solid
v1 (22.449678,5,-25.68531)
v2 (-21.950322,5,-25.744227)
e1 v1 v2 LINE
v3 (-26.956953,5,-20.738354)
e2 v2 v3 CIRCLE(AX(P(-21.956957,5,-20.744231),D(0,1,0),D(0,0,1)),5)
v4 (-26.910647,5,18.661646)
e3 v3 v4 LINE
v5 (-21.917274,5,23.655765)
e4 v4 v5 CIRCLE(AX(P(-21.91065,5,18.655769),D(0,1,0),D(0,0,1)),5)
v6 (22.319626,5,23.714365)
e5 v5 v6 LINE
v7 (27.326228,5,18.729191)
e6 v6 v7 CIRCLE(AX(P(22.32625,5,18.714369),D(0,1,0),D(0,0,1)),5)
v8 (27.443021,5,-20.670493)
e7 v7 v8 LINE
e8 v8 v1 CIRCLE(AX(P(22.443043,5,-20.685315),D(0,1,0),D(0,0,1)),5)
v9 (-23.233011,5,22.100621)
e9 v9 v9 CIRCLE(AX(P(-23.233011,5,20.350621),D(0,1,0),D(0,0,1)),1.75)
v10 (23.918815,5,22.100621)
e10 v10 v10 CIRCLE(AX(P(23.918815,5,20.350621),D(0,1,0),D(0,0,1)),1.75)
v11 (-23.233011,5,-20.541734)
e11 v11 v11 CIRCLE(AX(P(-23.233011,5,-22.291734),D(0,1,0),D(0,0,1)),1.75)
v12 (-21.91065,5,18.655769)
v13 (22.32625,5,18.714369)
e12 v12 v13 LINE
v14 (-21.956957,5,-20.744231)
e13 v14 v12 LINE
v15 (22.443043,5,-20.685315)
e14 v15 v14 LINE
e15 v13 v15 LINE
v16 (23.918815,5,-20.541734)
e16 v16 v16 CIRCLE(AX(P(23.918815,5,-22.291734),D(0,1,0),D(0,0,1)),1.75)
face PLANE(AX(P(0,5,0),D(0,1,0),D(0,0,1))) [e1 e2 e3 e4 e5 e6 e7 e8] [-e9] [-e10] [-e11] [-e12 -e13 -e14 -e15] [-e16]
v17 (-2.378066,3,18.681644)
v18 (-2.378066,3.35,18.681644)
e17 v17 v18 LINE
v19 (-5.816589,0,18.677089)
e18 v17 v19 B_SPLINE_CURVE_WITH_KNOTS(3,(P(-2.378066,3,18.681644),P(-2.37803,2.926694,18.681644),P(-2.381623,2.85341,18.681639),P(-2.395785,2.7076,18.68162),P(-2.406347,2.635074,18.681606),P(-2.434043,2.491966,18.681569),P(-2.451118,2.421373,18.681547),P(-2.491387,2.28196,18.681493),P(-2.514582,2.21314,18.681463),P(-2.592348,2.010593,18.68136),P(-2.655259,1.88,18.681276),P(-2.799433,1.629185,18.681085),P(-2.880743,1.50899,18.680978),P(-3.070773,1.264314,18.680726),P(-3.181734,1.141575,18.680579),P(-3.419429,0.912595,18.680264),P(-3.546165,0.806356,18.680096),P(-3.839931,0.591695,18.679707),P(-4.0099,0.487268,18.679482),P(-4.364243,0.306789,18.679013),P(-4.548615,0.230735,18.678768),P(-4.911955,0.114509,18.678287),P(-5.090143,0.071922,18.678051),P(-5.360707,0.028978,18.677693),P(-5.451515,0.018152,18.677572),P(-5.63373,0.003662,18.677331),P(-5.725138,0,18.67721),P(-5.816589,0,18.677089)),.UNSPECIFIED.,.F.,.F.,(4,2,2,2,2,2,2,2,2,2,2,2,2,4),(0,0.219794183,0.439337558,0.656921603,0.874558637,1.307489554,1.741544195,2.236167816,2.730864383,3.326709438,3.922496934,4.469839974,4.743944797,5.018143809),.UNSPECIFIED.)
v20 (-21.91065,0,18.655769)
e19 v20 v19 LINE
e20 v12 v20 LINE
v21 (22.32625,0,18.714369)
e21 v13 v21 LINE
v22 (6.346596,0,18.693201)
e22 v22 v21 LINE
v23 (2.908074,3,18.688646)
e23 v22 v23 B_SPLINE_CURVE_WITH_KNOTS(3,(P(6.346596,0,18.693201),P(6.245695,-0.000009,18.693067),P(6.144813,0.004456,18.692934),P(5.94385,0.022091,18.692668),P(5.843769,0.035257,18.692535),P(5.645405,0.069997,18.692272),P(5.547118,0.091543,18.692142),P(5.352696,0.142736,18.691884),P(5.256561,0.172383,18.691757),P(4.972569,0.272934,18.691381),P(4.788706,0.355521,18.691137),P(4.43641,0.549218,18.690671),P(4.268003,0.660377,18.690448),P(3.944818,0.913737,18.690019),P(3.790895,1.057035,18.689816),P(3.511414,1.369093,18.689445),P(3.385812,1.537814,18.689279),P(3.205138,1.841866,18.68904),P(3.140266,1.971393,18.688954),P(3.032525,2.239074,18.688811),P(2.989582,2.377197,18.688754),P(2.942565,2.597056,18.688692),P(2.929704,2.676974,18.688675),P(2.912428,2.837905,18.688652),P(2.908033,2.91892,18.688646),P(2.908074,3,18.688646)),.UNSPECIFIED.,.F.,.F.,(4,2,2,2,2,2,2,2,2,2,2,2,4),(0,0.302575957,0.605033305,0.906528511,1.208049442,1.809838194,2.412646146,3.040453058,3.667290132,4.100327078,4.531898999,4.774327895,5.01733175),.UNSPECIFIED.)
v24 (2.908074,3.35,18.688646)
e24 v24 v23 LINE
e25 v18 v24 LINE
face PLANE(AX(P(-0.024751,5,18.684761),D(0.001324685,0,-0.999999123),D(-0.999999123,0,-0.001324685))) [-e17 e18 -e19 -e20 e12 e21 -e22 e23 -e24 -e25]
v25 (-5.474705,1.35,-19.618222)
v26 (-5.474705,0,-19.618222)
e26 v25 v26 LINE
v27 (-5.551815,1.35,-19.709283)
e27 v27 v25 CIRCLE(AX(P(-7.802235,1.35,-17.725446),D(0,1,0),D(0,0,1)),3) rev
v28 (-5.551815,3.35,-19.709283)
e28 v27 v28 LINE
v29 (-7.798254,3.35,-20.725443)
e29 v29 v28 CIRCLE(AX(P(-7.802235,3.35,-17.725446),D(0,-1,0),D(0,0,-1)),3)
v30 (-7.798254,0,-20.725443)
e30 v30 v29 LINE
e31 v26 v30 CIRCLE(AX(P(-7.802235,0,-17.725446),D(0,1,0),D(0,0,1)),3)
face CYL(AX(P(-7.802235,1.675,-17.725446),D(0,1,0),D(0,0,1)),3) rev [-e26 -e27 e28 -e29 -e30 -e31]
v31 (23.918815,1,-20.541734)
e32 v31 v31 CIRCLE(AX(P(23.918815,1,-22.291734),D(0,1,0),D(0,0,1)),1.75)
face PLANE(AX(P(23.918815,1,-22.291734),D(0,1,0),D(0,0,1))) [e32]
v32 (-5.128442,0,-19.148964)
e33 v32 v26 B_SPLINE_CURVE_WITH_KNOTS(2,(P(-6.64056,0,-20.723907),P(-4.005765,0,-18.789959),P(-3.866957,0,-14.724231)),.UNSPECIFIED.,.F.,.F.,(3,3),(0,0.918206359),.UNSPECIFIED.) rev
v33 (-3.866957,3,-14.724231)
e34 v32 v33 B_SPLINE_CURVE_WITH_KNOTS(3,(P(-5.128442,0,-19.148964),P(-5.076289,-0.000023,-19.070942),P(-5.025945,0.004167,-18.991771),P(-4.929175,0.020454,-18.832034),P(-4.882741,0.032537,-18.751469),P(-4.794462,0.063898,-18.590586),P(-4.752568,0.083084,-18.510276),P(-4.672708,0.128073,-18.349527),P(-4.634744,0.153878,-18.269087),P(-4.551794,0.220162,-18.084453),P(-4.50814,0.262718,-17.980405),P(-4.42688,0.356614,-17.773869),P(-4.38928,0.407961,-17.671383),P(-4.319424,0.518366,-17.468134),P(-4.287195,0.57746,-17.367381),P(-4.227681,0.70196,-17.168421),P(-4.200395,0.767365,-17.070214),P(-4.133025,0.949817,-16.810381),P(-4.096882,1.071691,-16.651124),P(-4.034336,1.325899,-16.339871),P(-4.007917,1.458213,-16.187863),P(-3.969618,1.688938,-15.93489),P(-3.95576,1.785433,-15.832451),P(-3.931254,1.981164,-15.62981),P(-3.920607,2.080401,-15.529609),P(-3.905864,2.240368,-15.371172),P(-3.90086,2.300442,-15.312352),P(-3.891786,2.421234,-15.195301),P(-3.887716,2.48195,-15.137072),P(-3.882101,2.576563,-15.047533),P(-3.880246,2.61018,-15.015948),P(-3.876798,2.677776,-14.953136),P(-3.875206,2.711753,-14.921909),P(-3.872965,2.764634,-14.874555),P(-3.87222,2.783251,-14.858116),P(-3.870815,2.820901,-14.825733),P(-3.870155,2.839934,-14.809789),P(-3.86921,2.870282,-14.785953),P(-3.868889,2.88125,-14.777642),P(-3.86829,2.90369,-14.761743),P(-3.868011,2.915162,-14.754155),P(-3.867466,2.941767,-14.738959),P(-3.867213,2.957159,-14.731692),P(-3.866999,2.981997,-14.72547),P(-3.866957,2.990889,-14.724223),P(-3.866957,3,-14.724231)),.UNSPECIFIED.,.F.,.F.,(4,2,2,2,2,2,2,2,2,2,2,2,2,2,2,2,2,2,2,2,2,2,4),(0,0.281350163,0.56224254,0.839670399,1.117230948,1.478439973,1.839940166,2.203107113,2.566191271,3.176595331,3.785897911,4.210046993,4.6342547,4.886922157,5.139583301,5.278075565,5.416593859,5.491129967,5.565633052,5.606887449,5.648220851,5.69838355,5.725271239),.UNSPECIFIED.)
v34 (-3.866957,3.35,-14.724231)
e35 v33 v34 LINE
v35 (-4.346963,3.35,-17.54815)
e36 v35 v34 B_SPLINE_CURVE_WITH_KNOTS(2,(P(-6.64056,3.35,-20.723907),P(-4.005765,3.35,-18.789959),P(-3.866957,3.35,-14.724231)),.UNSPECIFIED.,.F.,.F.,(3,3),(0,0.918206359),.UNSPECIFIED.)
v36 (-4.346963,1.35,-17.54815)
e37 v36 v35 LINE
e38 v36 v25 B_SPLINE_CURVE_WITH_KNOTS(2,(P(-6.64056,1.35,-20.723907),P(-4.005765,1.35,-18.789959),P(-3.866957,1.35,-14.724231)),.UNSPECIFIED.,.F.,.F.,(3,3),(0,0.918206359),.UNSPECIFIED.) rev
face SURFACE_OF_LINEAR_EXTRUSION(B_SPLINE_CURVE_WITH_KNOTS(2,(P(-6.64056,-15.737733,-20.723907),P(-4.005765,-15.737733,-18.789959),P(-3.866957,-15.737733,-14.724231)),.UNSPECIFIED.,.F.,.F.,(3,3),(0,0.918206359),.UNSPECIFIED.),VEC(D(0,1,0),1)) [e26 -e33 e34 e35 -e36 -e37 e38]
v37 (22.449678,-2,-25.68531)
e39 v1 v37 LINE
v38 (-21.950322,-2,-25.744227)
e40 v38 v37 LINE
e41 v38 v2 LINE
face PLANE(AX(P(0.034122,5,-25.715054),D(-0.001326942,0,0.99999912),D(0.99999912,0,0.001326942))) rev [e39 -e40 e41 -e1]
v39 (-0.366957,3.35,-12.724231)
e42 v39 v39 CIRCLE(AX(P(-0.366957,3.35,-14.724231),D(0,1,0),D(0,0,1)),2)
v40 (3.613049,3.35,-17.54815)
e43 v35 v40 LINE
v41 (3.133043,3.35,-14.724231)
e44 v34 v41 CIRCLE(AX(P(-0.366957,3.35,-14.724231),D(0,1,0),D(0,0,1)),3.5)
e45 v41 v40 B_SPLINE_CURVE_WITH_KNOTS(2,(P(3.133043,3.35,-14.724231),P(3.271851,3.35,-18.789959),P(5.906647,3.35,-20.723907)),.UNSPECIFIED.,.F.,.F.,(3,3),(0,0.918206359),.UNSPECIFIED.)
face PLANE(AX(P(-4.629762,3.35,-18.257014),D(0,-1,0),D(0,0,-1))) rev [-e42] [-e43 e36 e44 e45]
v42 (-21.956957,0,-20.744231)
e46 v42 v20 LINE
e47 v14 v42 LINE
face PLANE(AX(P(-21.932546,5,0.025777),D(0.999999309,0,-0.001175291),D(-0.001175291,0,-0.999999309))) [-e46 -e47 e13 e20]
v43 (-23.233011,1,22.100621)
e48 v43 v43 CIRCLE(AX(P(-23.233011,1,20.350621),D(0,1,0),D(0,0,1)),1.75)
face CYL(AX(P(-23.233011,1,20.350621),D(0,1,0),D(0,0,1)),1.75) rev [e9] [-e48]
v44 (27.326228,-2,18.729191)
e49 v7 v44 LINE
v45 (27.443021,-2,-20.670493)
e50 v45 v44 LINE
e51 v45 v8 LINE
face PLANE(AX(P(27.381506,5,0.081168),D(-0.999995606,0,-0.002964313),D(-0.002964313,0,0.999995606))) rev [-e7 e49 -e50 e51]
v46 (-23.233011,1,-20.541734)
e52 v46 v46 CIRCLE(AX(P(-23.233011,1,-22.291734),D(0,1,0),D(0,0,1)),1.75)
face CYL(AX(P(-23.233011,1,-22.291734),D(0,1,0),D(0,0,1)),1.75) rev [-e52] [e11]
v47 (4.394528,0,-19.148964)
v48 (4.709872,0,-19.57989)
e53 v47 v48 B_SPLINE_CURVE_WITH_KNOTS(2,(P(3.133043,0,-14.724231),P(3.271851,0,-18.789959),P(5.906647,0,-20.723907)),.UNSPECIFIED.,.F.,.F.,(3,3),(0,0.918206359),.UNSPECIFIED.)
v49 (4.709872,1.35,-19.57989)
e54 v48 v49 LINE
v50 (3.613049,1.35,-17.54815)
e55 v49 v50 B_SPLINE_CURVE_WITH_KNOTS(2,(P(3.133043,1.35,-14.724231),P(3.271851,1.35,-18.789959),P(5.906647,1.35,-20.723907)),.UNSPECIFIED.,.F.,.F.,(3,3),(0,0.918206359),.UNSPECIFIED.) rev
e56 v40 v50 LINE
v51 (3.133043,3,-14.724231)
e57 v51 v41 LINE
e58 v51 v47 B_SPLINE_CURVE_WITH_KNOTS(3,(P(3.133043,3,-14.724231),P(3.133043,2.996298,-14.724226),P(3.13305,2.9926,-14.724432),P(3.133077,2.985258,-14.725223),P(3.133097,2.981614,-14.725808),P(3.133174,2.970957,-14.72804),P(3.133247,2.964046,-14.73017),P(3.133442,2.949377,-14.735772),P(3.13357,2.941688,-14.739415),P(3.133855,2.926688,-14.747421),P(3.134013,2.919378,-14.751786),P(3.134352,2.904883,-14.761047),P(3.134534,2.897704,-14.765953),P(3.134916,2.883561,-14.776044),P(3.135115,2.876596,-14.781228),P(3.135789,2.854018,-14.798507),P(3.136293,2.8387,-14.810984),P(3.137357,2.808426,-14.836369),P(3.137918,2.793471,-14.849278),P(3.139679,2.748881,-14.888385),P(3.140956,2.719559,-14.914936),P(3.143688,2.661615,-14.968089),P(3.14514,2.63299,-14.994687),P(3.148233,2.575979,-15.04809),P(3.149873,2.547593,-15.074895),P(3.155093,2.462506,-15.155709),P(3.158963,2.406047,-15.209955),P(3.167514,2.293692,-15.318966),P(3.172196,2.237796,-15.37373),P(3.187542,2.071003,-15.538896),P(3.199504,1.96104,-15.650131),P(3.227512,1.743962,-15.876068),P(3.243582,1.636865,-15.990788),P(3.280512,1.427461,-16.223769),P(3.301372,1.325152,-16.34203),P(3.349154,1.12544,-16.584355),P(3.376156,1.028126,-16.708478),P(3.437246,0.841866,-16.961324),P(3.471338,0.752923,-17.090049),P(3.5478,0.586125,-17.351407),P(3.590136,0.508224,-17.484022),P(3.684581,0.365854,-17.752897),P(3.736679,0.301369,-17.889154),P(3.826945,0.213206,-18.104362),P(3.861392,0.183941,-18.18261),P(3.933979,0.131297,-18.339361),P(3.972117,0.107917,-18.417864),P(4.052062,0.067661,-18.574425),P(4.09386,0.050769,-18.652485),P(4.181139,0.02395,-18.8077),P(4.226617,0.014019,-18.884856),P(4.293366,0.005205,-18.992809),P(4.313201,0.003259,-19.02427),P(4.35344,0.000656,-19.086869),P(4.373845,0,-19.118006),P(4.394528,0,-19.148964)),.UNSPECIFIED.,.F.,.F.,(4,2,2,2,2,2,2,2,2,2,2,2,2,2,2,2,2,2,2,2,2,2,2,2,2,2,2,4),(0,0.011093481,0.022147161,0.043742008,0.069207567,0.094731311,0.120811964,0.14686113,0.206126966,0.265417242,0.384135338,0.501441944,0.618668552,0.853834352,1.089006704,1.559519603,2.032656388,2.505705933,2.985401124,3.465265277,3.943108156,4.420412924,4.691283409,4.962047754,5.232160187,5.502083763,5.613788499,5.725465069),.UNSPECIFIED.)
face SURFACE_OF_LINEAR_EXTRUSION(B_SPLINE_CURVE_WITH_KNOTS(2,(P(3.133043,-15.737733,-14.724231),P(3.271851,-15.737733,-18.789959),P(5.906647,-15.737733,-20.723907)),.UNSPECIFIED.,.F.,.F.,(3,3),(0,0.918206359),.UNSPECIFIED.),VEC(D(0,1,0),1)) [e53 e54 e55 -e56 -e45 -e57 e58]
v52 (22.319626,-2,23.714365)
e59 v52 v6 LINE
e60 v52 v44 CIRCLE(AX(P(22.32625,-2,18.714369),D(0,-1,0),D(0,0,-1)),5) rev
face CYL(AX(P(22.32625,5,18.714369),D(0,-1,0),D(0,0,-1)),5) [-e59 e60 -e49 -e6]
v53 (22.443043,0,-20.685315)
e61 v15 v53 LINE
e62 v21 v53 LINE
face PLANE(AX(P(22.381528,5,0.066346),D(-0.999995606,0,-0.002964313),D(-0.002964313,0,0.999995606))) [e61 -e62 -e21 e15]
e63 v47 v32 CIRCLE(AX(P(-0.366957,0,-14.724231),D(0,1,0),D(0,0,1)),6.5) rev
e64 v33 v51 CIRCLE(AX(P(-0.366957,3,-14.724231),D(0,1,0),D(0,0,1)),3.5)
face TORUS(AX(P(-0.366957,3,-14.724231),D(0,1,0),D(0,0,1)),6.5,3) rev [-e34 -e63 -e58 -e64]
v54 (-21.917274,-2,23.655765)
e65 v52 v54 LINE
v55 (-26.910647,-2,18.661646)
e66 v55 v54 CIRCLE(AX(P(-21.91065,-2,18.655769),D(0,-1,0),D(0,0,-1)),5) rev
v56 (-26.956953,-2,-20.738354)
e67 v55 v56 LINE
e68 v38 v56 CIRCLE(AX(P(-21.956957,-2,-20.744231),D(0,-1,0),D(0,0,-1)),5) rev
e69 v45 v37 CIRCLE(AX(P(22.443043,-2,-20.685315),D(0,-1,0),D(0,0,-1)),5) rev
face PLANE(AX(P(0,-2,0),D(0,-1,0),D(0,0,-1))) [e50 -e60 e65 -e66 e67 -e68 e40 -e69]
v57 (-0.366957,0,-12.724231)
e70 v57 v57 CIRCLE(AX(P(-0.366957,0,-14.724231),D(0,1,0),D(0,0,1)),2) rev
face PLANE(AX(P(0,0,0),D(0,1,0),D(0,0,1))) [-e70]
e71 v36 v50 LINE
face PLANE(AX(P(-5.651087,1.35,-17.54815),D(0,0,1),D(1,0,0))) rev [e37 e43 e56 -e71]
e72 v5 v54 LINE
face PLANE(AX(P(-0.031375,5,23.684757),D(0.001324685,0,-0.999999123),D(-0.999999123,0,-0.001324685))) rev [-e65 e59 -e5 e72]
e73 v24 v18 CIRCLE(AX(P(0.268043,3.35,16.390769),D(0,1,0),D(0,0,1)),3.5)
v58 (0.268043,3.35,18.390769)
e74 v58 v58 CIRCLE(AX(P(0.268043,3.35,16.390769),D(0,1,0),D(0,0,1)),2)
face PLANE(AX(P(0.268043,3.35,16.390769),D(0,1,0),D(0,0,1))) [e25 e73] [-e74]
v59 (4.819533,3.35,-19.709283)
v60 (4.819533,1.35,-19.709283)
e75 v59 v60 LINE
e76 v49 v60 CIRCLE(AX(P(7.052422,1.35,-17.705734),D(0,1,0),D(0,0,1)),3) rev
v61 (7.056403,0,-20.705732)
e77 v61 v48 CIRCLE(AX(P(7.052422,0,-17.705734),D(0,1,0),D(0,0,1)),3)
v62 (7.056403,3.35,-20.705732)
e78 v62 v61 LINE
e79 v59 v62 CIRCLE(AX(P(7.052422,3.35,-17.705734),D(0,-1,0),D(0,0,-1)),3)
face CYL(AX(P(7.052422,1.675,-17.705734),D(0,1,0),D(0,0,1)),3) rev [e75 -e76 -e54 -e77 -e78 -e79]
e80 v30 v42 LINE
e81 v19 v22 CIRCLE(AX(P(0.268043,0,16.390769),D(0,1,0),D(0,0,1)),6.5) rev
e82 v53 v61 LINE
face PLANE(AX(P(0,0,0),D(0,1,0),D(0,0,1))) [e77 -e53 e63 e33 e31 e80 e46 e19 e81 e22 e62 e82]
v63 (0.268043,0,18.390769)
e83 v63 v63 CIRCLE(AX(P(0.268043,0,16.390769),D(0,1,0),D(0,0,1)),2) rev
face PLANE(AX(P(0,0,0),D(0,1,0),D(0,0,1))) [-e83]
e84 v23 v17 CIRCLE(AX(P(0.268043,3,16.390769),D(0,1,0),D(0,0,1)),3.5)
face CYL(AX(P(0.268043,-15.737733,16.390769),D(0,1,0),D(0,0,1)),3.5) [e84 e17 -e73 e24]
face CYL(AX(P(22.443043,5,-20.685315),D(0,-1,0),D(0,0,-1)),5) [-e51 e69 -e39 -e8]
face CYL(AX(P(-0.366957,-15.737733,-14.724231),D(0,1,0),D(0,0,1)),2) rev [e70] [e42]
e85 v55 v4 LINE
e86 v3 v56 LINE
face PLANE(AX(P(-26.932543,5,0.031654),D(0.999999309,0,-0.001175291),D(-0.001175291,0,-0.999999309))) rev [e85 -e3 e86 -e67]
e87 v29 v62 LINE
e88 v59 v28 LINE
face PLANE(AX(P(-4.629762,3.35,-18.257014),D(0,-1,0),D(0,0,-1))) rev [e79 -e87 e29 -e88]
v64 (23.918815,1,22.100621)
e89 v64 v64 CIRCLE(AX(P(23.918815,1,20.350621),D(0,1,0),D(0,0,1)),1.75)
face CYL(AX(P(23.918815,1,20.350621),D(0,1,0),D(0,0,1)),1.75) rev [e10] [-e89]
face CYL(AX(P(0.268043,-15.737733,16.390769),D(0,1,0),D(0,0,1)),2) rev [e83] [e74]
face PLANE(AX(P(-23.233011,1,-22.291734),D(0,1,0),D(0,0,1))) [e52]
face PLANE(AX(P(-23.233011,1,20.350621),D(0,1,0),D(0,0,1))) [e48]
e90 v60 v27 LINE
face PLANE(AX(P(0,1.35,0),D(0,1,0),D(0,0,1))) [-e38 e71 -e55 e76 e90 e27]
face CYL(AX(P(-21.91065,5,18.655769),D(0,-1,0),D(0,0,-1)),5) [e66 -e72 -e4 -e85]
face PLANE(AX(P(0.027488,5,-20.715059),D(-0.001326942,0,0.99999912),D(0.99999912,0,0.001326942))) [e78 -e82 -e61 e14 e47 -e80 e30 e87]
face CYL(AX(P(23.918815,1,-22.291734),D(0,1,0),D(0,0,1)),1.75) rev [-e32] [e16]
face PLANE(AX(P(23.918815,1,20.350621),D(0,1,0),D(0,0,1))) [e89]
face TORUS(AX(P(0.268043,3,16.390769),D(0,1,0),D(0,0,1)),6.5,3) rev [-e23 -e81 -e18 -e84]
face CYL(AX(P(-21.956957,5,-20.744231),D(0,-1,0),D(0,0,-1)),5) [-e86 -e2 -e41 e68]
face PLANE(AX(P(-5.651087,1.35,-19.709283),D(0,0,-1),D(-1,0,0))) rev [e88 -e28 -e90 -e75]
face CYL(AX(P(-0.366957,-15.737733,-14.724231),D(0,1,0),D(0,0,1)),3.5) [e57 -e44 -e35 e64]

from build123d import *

# Parameters (mm, degrees)
CROQUIS1_R              = 1.3
SALIENTE_EXTRUIR1_DEPTH = 5
VACIADO1_START          = -5
VACIADO1_DEPTH          = 5
VACIADO1_2_OUTLINE_R    = 1.3
VACIADO1_2_DEPTH        = 5
VACIADO1_3_OUTLINE_R    = 1.3
VACIADO1_3_DEPTH        = 5
SALIENTE_EXTRUIR2_START = -1.65
CROQUIS2_R              = 3.5
CROQUIS2_R_2            = 2
SALIENTE_EXTRUIR2_DEPTH = 3.35
CROQUIS3_R              = 2
CORTAR_EXTRUIR1_DEPTH   = 5
REDONDEO1_R             = 5
CROQUIS4_R              = 1.75
CORTAR_EXTRUIR2_DEPTH   = 4
REDONDEO2_R             = 3
CROQUIS5_W              = 10.71017297
CROQUIS5_H              = 2.16113269
CORTAR_EXTRUIR3_DEPTH   = 2
REDONDEO3_R             = 5
CROQUIS6_W              = 134.393326308
CROQUIS6_H              = 117.100902836
CORTAR_EXTRUIR4_DEPTH   = 3


# Read off the part's stored shape, not the designer's step: Vaciado1
with BuildPart() as part:
    # Croquis1 → Saliente-Extruir1 (new body)
    with BuildSketch(Plane(origin=(0, 0, 0), x_dir=(1, 0, 0), z_dir=(0, 1, 0))):
        Polygon((-21.910650365, -18.655769069), (22.326249635, -18.714369069), (22.443043136, 20.685314639), (-21.956956864, 20.744230931), align=None)
        with Locations(Location((0.268043136, -16.390769069, 0), (0, 0, 270))):
            Circle(CROQUIS1_R, mode=Mode.SUBTRACT)
        with Locations(Location((-0.366956864, 14.724230931, 0), (0, 0, 270))):
            Circle(CROQUIS1_R, mode=Mode.SUBTRACT)
    extrude(amount=SALIENTE_EXTRUIR1_DEPTH)

    # Vaciado1 outline → Vaciado1 (add)
    with BuildSketch(Plane(origin=(0, 0, 0), x_dir=(1, 0, 0), z_dir=(0, 1, 0)).offset(VACIADO1_START)):
        Polygon((-26.904785129, -23.649157796), (27.311430385, -23.720977255), (27.457867021, 25.678664653), (-26.962844589, 25.750877863), align=None)
    extrude(amount=VACIADO1_DEPTH)

    # Vaciado1 2 outline → Vaciado1 2 (add)
    # profile 1 of 3: a face of its own
    with BuildSketch(Plane(origin=(0, 0, 0), x_dir=(1, 0, 0), z_dir=(0, 1, 0))):
        Polygon((-26.904785129, -23.649157796), (27.311430385, -23.720977255), (27.457867021, 25.678664653), (-26.962844589, 25.750877863), align=None)
        Polygon((22.443043136, 20.685314639), (22.326249635, -18.714369069), (-21.910650365, -18.655769069), (-21.956956864, 20.744230931), align=None, mode=Mode.SUBTRACT)
    # profile 2 of 3: a face of its own
    with BuildSketch(Plane(origin=(0, 0, 0), x_dir=(1, 0, 0), z_dir=(0, 1, 0))):
        with Locations((0.268043136, -16.390769069)):
            Circle(VACIADO1_2_OUTLINE_R)
    # profile 3 of 3: a face of its own
    with BuildSketch(Plane(origin=(0, 0, 0), x_dir=(1, 0, 0), z_dir=(0, 1, 0))):
        with Locations((-0.366956864, 14.724230931)):
            Circle(VACIADO1_2_OUTLINE_R)
    extrude(amount=VACIADO1_2_DEPTH)

    # Vaciado1 3 outline → Vaciado1 3 (cut)
    with BuildSketch(Plane(origin=(0, 0, 0), x_dir=(1, 0, 0), z_dir=(0, 1, 0))):
        Polygon((-21.910650365, -18.655769069), (22.326249635, -18.714369069), (22.443043136, 20.685314639), (-21.956956864, 20.744230931), align=None)
        with Locations((0.268043136, -16.390769069)):
            Circle(VACIADO1_3_OUTLINE_R, mode=Mode.SUBTRACT)
        with Locations((-0.366956864, 14.724230931)):
            Circle(VACIADO1_3_OUTLINE_R, mode=Mode.SUBTRACT)
    extrude(amount=VACIADO1_3_DEPTH, mode=Mode.SUBTRACT)

    # Croquis2 → Saliente-Extruir2 (add)
    # profile 1 of 2: a face of its own
    with BuildSketch(Plane(origin=(0, 5, 0), x_dir=(1, 0, 0), z_dir=(0, 1, 0)).offset(SALIENTE_EXTRUIR2_START)):
        with Locations((0.268043136, -16.390769069)):
            Circle(CROQUIS2_R)
        with Locations(Location((0.268043136, -16.390769069, 0), (0, 0, 270))):
            Circle(CROQUIS2_R_2, mode=Mode.SUBTRACT)
    # profile 2 of 2: a face of its own
    with BuildSketch(Plane(origin=(0, 5, 0), x_dir=(1, 0, 0), z_dir=(0, 1, 0)).offset(SALIENTE_EXTRUIR2_START)):
        with BuildLine():
            Line((-6.64056044, 20.723906938), (5.906646712, 20.723906938))
            add(Edge.make_bspline(
                [(3.133043136, 14.724230931), (3.271851145, 18.789959359), (5.906646712, 20.723906938)],
                knots=[0, 0, 0, 0.918206359, 0.918206359, 0.918206359], degree=2))
            ThreePointArc((3.133043136, 14.724230931), (-0.366956864, 11.224230931), (-3.866956864, 14.724230931))
            add(Edge.make_bspline(
                [(-3.866956864, 14.724230931), (-4.005764873, 18.789959359), (-6.64056044, 20.723906938)],
                knots=[0, 0, 0, 0.918206359, 0.918206359, 0.918206359], degree=2))
        make_face()
        with Locations(Location((-0.366956864, 14.724230931, 0), (0, 0, 270))):
            Circle(CROQUIS2_R_2, mode=Mode.SUBTRACT)
    extrude(amount=-SALIENTE_EXTRUIR2_DEPTH)

    # Croquis3 → Cortar-Extruir1 (cut)
    with BuildSketch(Plane(origin=(0, 5, 0), x_dir=(1, 0, 0), z_dir=(0, 1, 0))):
        with Locations(Location((-0.366956864, 14.724230931, 0), (0, 0, 270))):
            Circle(CROQUIS3_R)
        with Locations(Location((0.268043136, -16.390769069, 0), (0, 0, 270))):
            Circle(CROQUIS3_R)
    extrude(amount=-CORTAR_EXTRUIR1_DEPTH, mode=Mode.SUBTRACT)

    # Redondeo1
    redondeo1_edges = [part.edges().sort_by_distance(p)[0] for p in [
        (-26.962844589, 0, -25.750877863),
        (27.457867021, 0, -25.678664653),
    ]]
    fillet(redondeo1_edges, radius=REDONDEO1_R)

    # Croquis4 → Cortar-Extruir2 (cut)
    with BuildSketch(Plane(origin=(0, 5, 0), x_dir=(1, 0, 0), z_dir=(0, 1, 0))):
        with Locations(Location((-23.233010561, -20.350621098, 0), (0, 0, 270))):
            Circle(CROQUIS4_R)
        with Locations(Location((23.918815335, -20.350621098, 0), (0, 0, 270))):
            Circle(CROQUIS4_R)
        with Locations(Location((23.918815335, 22.291734245, 0), (0, 0, 270))):
            Circle(CROQUIS4_R)
        with Locations(Location((-23.233010561, 22.291734245, 0), (0, 0, 270))):
            Circle(CROQUIS4_R)
    extrude(amount=-CORTAR_EXTRUIR2_DEPTH, mode=Mode.SUBTRACT)

    # Redondeo2
    # the kernel refuses this fillet: 3 mm, written as the material it adds along each edge
    with BuildSketch(Plane(origin=(0.268043136, 0, 16.390769069), x_dir=(-0.004466262982364763, 0, 0.9999900261977478), z_dir=(0.9999900261977478, 0, 0.004466262982364763))) as redondeo2_piece_1_section:
        with BuildLine():
            CenterArc((3.5 + REDONDEO2_R, -REDONDEO2_R), REDONDEO2_R, 90, 90)
            Line((3.5, -REDONDEO2_R), (3.5 - REDONDEO2_R * 0.02, -REDONDEO2_R))
            Line((3.5 - REDONDEO2_R * 0.02, -REDONDEO2_R), (3.5 - REDONDEO2_R * 0.02, REDONDEO2_R * 0.02))
            Line((3.5 - REDONDEO2_R * 0.02, REDONDEO2_R * 0.02), (3.5 + REDONDEO2_R, REDONDEO2_R * 0.02))
            Line((3.5 + REDONDEO2_R, REDONDEO2_R * 0.02), (3.5 + REDONDEO2_R, 0))
        make_face()
    redondeo2_piece_1 = revolve(axis=Axis((0.268043136, 0, 16.390769069), (0, -1, 0)), revolution_arc=359.64, mode=Mode.PRIVATE)
    redondeo2_piece_1 = split(redondeo2_piece_1, bisect_by=Plane(origin=(0.265003809, 0.854230432, 18.685144847), z_dir=(0.0013246847899521655, 0, -0.9999991226047188)), keep=Keep.TOP, mode=Mode.PRIVATE)
    add(redondeo2_piece_1)
    with BuildSketch(Plane(origin=(-0.366956864, 0, -14.724230931), x_dir=(0.003141587485879655, 0, -0.9999950652018582), z_dir=(-0.9999950652018582, 0, -0.003141587485879655))) as redondeo2_piece_2:
        with BuildLine():
            CenterArc((3.5 + REDONDEO2_R, -REDONDEO2_R), REDONDEO2_R, 90, 90)
            Line((3.5, -REDONDEO2_R), (3.5 - REDONDEO2_R * 0.02, -REDONDEO2_R))
            Line((3.5 - REDONDEO2_R * 0.02, -REDONDEO2_R), (3.5 - REDONDEO2_R * 0.02, REDONDEO2_R * 0.02))
            Line((3.5 - REDONDEO2_R * 0.02, REDONDEO2_R * 0.02), (3.5 + REDONDEO2_R, REDONDEO2_R * 0.02))
            Line((3.5 + REDONDEO2_R, REDONDEO2_R * 0.02), (3.5 + REDONDEO2_R, 0))
        make_face()
    revolve(axis=Axis((-0.366956864, 0, -14.724230931), (0, -1, 0)), revolution_arc=359.64)
    with BuildSketch(Plane(origin=(5.884103635, 0, -20.707287416), x_dir=(0.9999991196116186, -2.6407019803235333e-15, 0.001326942345288348), z_dir=(0, 1, 0))) as redondeo2_piece_3:
        with BuildLine():
            CenterArc((1.172300158, -3), REDONDEO2_R, 90, 51.414502479)
            Line((-1.172734926, -1.128954716), (-1.219635628, -1.09153381))
            ThreePointArc((-1.219635628, -1.09153381), (-0.664607818, -0.483065198), (-0.035769429, 0.048172066))
            Line((-0.035769429, 0.048172066), (0, 0.06))
            Line((0, 0.06), (1.172300158, 0.06))
            Line((1.172300158, 0.06), (1.172300158, 0))
        make_face()
    extrude(amount=3.35)
    with BuildSketch(Plane(origin=(-6.64056044, 3.35, -20.723906938), x_dir=(-0.9999991196114262, 0, -0.0013269424902280428), z_dir=(0, -1, 0))) as redondeo2_piece_4:
        with BuildLine():
            CenterArc((1.1576947, -3), REDONDEO2_R, 89.999999992, 50.80553693)
            Line((-1.167321988, -1.104136767), (-1.213822322, -1.066219502))
            ThreePointArc((-1.213822322, -1.066219502), (-0.660180294, -0.471028769), (-0.035438663, 0.048415919))
            Line((-0.035438663, 0.048415919), (0, 0.06))
            Line((0, 0.06), (1.157694701, 0.06))
            Line((1.157694701, 0.06), (1.157694701, 0))
        make_face()
    extrude(amount=3.35)

    # Croquis5 → Cortar-Extruir3 (cut)
    with BuildSketch(Plane(origin=(0, 3.35, 0), x_dir=(1, 0, 0), z_dir=(0, 1, 0))):
        with Locations((-0.296000529, 18.628716842)):
            Rectangle(CROQUIS5_W, CROQUIS5_H)
    extrude(amount=-CORTAR_EXTRUIR3_DEPTH, mode=Mode.SUBTRACT)

    # Redondeo3
    redondeo3_edges = [part.edges().sort_by_distance(p)[0] for p in [
        (-26.904785129, 0, 23.649157796),
        (27.311430385, 0, 23.720977255),
    ]]
    fillet(redondeo3_edges, radius=REDONDEO3_R)

    # Croquis6 → Cortar-Extruir4 (cut)
    with BuildSketch(Plane.XZ.offset(5)):
        with Locations((-0.420435638, 0)):
            Rectangle(CROQUIS6_W, CROQUIS6_H)
    extrude(amount=-CORTAR_EXTRUIR4_DEPTH, mode=Mode.SUBTRACT)


solid = part.part
